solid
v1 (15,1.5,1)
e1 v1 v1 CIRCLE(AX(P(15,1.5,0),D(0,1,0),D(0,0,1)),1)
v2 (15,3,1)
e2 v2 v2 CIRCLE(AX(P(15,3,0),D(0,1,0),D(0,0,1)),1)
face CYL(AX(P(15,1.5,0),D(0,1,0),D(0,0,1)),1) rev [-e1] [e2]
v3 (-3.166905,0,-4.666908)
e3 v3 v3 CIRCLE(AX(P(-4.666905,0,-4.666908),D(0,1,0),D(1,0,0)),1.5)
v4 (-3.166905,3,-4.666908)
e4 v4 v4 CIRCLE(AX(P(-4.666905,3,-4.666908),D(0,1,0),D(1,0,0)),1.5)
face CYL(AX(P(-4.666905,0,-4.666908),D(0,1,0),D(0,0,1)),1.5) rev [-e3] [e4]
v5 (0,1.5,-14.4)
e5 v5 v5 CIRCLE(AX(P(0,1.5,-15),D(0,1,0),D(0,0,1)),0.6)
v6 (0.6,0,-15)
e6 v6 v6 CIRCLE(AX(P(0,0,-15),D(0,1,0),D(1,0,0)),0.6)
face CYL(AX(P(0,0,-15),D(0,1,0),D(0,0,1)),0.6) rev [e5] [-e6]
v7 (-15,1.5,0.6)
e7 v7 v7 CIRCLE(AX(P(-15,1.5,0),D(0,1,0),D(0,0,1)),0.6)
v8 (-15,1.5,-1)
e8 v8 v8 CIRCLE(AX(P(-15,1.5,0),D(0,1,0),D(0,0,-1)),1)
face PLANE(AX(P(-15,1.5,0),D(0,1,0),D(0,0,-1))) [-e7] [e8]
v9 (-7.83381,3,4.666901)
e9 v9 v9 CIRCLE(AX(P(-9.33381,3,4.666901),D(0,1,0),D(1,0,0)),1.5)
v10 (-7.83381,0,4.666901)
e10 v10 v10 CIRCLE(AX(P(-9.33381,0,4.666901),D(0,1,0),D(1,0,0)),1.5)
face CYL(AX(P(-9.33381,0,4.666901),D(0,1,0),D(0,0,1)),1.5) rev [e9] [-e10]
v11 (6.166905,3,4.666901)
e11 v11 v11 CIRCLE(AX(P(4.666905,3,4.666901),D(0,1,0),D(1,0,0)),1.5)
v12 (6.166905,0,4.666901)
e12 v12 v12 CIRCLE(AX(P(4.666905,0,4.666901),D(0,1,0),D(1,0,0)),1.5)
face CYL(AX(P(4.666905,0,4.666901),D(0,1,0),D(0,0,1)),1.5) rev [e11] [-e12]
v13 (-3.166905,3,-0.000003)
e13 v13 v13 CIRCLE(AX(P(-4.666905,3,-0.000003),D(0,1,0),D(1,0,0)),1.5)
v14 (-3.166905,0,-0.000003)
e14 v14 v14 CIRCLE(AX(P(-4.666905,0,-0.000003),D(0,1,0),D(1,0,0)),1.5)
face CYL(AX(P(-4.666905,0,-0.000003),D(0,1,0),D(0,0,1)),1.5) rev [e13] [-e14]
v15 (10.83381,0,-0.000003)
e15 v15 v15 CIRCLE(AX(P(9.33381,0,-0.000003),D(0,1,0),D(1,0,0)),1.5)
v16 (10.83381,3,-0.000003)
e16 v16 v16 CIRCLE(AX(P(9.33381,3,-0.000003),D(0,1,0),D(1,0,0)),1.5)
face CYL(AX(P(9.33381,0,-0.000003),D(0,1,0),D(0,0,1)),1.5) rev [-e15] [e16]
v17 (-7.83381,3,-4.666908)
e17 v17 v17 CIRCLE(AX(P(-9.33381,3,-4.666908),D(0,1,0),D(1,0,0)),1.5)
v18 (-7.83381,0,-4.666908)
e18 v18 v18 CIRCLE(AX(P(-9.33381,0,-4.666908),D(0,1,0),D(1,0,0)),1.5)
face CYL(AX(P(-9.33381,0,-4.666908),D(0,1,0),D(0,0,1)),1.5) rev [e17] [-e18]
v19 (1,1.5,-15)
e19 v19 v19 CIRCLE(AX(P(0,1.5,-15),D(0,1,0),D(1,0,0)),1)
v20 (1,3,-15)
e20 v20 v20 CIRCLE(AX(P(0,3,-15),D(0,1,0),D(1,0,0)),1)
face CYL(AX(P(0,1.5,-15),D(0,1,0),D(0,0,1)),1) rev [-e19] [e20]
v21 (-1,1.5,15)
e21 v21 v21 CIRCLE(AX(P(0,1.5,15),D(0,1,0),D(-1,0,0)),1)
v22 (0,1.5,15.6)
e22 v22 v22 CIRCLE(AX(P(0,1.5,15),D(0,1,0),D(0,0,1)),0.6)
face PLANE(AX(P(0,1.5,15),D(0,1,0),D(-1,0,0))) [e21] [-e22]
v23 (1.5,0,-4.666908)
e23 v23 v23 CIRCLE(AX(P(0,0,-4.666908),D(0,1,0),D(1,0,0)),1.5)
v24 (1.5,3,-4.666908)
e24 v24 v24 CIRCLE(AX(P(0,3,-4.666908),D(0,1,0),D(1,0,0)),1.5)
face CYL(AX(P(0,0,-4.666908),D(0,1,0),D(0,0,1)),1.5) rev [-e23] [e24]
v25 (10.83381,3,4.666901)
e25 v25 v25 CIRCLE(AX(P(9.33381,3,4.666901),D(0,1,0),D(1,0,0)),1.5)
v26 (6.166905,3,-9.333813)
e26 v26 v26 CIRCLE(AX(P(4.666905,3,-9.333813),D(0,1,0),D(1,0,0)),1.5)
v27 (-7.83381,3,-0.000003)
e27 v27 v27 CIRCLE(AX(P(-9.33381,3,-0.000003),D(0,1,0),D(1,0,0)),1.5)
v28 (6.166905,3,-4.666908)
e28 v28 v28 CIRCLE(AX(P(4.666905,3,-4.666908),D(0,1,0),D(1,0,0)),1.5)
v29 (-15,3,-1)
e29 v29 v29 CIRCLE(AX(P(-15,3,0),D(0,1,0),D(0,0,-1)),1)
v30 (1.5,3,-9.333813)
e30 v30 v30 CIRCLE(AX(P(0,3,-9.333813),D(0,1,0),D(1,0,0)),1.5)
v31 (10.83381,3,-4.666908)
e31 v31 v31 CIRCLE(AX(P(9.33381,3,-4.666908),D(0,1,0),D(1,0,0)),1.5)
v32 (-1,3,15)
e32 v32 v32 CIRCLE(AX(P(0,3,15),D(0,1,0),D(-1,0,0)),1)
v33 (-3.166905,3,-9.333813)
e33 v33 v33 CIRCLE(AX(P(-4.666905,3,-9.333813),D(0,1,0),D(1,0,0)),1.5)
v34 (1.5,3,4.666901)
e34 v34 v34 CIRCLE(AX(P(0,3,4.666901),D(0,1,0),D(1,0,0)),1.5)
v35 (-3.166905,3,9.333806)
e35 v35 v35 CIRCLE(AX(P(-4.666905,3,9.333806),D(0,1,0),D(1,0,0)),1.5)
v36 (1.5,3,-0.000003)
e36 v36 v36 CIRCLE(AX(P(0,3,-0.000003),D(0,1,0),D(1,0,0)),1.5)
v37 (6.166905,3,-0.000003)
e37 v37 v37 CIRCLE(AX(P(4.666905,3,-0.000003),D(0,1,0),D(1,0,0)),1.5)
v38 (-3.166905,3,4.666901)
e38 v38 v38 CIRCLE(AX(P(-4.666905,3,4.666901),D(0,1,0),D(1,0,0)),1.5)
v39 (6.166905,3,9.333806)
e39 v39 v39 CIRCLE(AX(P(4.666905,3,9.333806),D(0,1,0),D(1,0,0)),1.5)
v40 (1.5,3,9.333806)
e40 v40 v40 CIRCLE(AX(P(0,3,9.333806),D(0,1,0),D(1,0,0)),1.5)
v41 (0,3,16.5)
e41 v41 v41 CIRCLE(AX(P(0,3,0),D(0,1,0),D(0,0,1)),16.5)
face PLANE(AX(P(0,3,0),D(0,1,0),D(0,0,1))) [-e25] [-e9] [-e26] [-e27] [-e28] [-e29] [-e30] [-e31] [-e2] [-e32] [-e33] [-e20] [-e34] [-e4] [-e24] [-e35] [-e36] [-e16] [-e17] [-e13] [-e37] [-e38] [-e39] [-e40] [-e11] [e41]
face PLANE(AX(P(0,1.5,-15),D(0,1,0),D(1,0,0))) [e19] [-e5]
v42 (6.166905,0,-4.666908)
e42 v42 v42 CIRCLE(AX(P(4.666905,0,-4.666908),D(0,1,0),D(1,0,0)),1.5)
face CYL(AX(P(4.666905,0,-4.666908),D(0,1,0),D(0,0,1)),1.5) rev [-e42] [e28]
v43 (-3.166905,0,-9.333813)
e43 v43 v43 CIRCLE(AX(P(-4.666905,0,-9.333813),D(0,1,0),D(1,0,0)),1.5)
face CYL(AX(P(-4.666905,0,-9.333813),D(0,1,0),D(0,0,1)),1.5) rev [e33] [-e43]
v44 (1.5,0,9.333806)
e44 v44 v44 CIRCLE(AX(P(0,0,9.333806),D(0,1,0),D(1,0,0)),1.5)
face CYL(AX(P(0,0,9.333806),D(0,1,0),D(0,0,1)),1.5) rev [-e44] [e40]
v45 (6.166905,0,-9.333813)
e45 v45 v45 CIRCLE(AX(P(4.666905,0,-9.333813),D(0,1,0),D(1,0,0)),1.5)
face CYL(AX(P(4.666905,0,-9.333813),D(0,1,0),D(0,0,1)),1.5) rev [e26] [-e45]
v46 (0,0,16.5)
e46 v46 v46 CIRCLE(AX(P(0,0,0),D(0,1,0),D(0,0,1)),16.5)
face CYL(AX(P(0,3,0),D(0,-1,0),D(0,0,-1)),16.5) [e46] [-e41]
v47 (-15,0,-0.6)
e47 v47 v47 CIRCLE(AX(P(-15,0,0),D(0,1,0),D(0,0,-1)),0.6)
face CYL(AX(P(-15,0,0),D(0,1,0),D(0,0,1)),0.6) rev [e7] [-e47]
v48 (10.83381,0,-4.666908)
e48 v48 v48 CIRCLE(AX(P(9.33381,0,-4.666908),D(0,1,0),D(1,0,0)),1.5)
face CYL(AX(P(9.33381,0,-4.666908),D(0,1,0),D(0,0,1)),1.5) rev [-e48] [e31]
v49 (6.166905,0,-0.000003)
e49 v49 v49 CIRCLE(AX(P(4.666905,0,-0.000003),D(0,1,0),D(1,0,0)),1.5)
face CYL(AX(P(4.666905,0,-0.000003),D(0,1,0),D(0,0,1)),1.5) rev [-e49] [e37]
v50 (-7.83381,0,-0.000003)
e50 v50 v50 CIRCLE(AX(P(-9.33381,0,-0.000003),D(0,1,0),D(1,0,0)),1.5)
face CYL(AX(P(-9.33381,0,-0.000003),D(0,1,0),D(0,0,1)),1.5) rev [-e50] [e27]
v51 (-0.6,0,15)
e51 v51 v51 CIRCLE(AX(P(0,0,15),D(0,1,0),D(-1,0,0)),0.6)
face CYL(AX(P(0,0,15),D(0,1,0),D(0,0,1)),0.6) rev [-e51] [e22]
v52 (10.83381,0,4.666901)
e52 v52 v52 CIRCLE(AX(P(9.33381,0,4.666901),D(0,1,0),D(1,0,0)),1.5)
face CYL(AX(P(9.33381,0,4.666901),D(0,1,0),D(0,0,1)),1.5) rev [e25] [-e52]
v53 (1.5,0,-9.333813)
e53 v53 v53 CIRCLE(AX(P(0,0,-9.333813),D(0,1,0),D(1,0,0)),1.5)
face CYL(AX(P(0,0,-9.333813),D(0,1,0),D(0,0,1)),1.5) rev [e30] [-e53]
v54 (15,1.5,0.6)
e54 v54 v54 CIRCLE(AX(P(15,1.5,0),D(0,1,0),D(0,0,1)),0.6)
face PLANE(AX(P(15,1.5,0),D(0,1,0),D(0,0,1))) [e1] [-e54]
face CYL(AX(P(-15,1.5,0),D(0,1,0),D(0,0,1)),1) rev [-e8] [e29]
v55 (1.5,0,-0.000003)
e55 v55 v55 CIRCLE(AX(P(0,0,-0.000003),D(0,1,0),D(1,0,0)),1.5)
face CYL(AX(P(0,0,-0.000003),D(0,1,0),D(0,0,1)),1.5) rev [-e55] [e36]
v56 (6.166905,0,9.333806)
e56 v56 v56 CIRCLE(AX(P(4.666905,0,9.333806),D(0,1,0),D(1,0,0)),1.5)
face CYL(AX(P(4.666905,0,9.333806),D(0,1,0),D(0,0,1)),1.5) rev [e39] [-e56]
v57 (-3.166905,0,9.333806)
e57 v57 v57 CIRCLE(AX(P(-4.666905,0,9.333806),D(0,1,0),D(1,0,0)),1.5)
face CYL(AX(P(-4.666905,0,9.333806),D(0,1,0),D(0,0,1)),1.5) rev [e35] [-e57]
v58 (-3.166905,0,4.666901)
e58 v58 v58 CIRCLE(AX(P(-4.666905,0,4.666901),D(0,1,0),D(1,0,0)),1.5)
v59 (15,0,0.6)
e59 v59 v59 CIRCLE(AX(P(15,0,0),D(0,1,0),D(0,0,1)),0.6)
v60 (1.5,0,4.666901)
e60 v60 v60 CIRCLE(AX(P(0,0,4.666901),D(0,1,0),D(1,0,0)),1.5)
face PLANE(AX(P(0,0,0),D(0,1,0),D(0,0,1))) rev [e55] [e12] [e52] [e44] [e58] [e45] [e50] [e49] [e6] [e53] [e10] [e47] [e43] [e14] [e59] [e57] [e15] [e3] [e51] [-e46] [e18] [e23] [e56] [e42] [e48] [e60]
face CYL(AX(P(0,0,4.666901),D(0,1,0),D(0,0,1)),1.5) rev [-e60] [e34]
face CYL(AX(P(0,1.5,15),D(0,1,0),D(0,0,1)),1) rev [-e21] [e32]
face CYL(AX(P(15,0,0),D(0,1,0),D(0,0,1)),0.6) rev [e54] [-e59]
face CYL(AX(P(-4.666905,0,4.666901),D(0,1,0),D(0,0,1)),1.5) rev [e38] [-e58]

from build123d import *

# Parameters (mm, degrees)
SKETCH_1_R               = 16.5
EXTRUDE_1_DEPTH          = 3
SKETCH_2_R               = 1
CUT_EXTRUDE_1_DEPTH      = 1.5
SKETCH_2_3_R             = 0.6
CUT_EXTRUDE_2_DEPTH      = 24.526580712
PATTERN_CIRCULAR_1_COUNT = 4
OTHER_1_OUTLINE_R        = 1.5
OTHER_1_DEPTH            = 3


# Read off the part's stored shape, not the designer's step: 填充阵列1
with BuildPart() as part:
    # 草图1 → 凸台-拉伸1 (new body)
    with BuildSketch(Plane(origin=(0, 0, 0), x_dir=(1, 0, 0), z_dir=(0, 1, 0))):
        with Locations(Location((0, 0, 0), (0, 0, 270))):
            Circle(SKETCH_1_R)
    extrude(amount=EXTRUDE_1_DEPTH)

    # 草图2 → 切除-拉伸1 (cut)
    with BuildSketch(Plane(origin=(0, 3, 0), x_dir=(1, 0, 0), z_dir=(0, 1, 0))):
        with Locations(Location((15, 0, 0), (0, 0, 270))):
            Circle(SKETCH_2_R)
    cut_extrude_1 = extrude(amount=-CUT_EXTRUDE_1_DEPTH, mode=Mode.SUBTRACT)

    # 草图2<3> → 切除-拉伸2 (cut, through all)
    with BuildSketch(Plane(origin=(0, 3, 0), x_dir=(1, 0, 0), z_dir=(0, 1, 0))):
        with Locations(Location((15, 0, 0), (0, 0, 270))):
            Circle(SKETCH_2_3_R)
    cut_extrude_2 = extrude(amount=-CUT_EXTRUDE_2_DEPTH, mode=Mode.SUBTRACT)

    # 阵列(圆周)1: 切除-拉伸1, 切除-拉伸2 ×4 about axis
    pattern_circular_1_axis = Axis((0, 0, 0), (0, 1, 0))
    add([cut_extrude_1.rotate(pattern_circular_1_axis, i * 360 / PATTERN_CIRCULAR_1_COUNT) for i in range(1, PATTERN_CIRCULAR_1_COUNT)], mode=Mode.SUBTRACT)
    add([cut_extrude_2.rotate(pattern_circular_1_axis, i * 360 / PATTERN_CIRCULAR_1_COUNT) for i in range(1, PATTERN_CIRCULAR_1_COUNT)], mode=Mode.SUBTRACT)

    # 填充阵列1 outline → 填充阵列1 (cut)
    with BuildSketch(Plane(origin=(0, 0, 0), x_dir=(1, 0, 0), z_dir=(0, 1, 0))):
        with Locations((0, 3.371e-06)):
            Circle(OTHER_1_OUTLINE_R)
        with Locations((-4.666904756, -9.333806141)):
            Circle(OTHER_1_OUTLINE_R)
        with Locations((0, -9.333806141)):
            Circle(OTHER_1_OUTLINE_R)
        with Locations((4.666904756, -9.333806141)):
            Circle(OTHER_1_OUTLINE_R)
        with Locations((9.333809512, -4.666901385)):
            Circle(OTHER_1_OUTLINE_R)
        with Locations((-9.333809512, 3.371e-06)):
            Circle(OTHER_1_OUTLINE_R)
        with Locations((0, 4.666908127)):
            Circle(OTHER_1_OUTLINE_R)
        with Locations((-9.333809512, 4.666908127)):
            Circle(OTHER_1_OUTLINE_R)
        with Locations((4.666904756, 4.666908127)):
            Circle(OTHER_1_OUTLINE_R)
        with Locations((-4.666904756, -4.666901385)):
            Circle(OTHER_1_OUTLINE_R)
        with Locations((-4.666904756, 3.371e-06)):
            Circle(OTHER_1_OUTLINE_R)
        with Locations((-9.333809512, -4.666901385)):
            Circle(OTHER_1_OUTLINE_R)
        with Locations((-4.666904756, 4.666908127)):
            Circle(OTHER_1_OUTLINE_R)
        with Locations((9.333809512, 3.371e-06)):
            Circle(OTHER_1_OUTLINE_R)
        with Locations((9.333809512, 4.666908127)):
            Circle(OTHER_1_OUTLINE_R)
        with Locations((4.666904756, 9.333812883)):
            Circle(OTHER_1_OUTLINE_R)
        with Locations((0, -4.666901385)):
            Circle(OTHER_1_OUTLINE_R)
        with Locations((4.666904756, 3.371e-06)):
            Circle(OTHER_1_OUTLINE_R)
        with Locations((-4.666904756, 9.333812883)):
            Circle(OTHER_1_OUTLINE_R)
        with Locations((4.666904756, -4.666901385)):
            Circle(OTHER_1_OUTLINE_R)
        with Locations((0, 9.333812883)):
            Circle(OTHER_1_OUTLINE_R)
    extrude(amount=OTHER_1_DEPTH, mode=Mode.SUBTRACT)


solid = part.part
